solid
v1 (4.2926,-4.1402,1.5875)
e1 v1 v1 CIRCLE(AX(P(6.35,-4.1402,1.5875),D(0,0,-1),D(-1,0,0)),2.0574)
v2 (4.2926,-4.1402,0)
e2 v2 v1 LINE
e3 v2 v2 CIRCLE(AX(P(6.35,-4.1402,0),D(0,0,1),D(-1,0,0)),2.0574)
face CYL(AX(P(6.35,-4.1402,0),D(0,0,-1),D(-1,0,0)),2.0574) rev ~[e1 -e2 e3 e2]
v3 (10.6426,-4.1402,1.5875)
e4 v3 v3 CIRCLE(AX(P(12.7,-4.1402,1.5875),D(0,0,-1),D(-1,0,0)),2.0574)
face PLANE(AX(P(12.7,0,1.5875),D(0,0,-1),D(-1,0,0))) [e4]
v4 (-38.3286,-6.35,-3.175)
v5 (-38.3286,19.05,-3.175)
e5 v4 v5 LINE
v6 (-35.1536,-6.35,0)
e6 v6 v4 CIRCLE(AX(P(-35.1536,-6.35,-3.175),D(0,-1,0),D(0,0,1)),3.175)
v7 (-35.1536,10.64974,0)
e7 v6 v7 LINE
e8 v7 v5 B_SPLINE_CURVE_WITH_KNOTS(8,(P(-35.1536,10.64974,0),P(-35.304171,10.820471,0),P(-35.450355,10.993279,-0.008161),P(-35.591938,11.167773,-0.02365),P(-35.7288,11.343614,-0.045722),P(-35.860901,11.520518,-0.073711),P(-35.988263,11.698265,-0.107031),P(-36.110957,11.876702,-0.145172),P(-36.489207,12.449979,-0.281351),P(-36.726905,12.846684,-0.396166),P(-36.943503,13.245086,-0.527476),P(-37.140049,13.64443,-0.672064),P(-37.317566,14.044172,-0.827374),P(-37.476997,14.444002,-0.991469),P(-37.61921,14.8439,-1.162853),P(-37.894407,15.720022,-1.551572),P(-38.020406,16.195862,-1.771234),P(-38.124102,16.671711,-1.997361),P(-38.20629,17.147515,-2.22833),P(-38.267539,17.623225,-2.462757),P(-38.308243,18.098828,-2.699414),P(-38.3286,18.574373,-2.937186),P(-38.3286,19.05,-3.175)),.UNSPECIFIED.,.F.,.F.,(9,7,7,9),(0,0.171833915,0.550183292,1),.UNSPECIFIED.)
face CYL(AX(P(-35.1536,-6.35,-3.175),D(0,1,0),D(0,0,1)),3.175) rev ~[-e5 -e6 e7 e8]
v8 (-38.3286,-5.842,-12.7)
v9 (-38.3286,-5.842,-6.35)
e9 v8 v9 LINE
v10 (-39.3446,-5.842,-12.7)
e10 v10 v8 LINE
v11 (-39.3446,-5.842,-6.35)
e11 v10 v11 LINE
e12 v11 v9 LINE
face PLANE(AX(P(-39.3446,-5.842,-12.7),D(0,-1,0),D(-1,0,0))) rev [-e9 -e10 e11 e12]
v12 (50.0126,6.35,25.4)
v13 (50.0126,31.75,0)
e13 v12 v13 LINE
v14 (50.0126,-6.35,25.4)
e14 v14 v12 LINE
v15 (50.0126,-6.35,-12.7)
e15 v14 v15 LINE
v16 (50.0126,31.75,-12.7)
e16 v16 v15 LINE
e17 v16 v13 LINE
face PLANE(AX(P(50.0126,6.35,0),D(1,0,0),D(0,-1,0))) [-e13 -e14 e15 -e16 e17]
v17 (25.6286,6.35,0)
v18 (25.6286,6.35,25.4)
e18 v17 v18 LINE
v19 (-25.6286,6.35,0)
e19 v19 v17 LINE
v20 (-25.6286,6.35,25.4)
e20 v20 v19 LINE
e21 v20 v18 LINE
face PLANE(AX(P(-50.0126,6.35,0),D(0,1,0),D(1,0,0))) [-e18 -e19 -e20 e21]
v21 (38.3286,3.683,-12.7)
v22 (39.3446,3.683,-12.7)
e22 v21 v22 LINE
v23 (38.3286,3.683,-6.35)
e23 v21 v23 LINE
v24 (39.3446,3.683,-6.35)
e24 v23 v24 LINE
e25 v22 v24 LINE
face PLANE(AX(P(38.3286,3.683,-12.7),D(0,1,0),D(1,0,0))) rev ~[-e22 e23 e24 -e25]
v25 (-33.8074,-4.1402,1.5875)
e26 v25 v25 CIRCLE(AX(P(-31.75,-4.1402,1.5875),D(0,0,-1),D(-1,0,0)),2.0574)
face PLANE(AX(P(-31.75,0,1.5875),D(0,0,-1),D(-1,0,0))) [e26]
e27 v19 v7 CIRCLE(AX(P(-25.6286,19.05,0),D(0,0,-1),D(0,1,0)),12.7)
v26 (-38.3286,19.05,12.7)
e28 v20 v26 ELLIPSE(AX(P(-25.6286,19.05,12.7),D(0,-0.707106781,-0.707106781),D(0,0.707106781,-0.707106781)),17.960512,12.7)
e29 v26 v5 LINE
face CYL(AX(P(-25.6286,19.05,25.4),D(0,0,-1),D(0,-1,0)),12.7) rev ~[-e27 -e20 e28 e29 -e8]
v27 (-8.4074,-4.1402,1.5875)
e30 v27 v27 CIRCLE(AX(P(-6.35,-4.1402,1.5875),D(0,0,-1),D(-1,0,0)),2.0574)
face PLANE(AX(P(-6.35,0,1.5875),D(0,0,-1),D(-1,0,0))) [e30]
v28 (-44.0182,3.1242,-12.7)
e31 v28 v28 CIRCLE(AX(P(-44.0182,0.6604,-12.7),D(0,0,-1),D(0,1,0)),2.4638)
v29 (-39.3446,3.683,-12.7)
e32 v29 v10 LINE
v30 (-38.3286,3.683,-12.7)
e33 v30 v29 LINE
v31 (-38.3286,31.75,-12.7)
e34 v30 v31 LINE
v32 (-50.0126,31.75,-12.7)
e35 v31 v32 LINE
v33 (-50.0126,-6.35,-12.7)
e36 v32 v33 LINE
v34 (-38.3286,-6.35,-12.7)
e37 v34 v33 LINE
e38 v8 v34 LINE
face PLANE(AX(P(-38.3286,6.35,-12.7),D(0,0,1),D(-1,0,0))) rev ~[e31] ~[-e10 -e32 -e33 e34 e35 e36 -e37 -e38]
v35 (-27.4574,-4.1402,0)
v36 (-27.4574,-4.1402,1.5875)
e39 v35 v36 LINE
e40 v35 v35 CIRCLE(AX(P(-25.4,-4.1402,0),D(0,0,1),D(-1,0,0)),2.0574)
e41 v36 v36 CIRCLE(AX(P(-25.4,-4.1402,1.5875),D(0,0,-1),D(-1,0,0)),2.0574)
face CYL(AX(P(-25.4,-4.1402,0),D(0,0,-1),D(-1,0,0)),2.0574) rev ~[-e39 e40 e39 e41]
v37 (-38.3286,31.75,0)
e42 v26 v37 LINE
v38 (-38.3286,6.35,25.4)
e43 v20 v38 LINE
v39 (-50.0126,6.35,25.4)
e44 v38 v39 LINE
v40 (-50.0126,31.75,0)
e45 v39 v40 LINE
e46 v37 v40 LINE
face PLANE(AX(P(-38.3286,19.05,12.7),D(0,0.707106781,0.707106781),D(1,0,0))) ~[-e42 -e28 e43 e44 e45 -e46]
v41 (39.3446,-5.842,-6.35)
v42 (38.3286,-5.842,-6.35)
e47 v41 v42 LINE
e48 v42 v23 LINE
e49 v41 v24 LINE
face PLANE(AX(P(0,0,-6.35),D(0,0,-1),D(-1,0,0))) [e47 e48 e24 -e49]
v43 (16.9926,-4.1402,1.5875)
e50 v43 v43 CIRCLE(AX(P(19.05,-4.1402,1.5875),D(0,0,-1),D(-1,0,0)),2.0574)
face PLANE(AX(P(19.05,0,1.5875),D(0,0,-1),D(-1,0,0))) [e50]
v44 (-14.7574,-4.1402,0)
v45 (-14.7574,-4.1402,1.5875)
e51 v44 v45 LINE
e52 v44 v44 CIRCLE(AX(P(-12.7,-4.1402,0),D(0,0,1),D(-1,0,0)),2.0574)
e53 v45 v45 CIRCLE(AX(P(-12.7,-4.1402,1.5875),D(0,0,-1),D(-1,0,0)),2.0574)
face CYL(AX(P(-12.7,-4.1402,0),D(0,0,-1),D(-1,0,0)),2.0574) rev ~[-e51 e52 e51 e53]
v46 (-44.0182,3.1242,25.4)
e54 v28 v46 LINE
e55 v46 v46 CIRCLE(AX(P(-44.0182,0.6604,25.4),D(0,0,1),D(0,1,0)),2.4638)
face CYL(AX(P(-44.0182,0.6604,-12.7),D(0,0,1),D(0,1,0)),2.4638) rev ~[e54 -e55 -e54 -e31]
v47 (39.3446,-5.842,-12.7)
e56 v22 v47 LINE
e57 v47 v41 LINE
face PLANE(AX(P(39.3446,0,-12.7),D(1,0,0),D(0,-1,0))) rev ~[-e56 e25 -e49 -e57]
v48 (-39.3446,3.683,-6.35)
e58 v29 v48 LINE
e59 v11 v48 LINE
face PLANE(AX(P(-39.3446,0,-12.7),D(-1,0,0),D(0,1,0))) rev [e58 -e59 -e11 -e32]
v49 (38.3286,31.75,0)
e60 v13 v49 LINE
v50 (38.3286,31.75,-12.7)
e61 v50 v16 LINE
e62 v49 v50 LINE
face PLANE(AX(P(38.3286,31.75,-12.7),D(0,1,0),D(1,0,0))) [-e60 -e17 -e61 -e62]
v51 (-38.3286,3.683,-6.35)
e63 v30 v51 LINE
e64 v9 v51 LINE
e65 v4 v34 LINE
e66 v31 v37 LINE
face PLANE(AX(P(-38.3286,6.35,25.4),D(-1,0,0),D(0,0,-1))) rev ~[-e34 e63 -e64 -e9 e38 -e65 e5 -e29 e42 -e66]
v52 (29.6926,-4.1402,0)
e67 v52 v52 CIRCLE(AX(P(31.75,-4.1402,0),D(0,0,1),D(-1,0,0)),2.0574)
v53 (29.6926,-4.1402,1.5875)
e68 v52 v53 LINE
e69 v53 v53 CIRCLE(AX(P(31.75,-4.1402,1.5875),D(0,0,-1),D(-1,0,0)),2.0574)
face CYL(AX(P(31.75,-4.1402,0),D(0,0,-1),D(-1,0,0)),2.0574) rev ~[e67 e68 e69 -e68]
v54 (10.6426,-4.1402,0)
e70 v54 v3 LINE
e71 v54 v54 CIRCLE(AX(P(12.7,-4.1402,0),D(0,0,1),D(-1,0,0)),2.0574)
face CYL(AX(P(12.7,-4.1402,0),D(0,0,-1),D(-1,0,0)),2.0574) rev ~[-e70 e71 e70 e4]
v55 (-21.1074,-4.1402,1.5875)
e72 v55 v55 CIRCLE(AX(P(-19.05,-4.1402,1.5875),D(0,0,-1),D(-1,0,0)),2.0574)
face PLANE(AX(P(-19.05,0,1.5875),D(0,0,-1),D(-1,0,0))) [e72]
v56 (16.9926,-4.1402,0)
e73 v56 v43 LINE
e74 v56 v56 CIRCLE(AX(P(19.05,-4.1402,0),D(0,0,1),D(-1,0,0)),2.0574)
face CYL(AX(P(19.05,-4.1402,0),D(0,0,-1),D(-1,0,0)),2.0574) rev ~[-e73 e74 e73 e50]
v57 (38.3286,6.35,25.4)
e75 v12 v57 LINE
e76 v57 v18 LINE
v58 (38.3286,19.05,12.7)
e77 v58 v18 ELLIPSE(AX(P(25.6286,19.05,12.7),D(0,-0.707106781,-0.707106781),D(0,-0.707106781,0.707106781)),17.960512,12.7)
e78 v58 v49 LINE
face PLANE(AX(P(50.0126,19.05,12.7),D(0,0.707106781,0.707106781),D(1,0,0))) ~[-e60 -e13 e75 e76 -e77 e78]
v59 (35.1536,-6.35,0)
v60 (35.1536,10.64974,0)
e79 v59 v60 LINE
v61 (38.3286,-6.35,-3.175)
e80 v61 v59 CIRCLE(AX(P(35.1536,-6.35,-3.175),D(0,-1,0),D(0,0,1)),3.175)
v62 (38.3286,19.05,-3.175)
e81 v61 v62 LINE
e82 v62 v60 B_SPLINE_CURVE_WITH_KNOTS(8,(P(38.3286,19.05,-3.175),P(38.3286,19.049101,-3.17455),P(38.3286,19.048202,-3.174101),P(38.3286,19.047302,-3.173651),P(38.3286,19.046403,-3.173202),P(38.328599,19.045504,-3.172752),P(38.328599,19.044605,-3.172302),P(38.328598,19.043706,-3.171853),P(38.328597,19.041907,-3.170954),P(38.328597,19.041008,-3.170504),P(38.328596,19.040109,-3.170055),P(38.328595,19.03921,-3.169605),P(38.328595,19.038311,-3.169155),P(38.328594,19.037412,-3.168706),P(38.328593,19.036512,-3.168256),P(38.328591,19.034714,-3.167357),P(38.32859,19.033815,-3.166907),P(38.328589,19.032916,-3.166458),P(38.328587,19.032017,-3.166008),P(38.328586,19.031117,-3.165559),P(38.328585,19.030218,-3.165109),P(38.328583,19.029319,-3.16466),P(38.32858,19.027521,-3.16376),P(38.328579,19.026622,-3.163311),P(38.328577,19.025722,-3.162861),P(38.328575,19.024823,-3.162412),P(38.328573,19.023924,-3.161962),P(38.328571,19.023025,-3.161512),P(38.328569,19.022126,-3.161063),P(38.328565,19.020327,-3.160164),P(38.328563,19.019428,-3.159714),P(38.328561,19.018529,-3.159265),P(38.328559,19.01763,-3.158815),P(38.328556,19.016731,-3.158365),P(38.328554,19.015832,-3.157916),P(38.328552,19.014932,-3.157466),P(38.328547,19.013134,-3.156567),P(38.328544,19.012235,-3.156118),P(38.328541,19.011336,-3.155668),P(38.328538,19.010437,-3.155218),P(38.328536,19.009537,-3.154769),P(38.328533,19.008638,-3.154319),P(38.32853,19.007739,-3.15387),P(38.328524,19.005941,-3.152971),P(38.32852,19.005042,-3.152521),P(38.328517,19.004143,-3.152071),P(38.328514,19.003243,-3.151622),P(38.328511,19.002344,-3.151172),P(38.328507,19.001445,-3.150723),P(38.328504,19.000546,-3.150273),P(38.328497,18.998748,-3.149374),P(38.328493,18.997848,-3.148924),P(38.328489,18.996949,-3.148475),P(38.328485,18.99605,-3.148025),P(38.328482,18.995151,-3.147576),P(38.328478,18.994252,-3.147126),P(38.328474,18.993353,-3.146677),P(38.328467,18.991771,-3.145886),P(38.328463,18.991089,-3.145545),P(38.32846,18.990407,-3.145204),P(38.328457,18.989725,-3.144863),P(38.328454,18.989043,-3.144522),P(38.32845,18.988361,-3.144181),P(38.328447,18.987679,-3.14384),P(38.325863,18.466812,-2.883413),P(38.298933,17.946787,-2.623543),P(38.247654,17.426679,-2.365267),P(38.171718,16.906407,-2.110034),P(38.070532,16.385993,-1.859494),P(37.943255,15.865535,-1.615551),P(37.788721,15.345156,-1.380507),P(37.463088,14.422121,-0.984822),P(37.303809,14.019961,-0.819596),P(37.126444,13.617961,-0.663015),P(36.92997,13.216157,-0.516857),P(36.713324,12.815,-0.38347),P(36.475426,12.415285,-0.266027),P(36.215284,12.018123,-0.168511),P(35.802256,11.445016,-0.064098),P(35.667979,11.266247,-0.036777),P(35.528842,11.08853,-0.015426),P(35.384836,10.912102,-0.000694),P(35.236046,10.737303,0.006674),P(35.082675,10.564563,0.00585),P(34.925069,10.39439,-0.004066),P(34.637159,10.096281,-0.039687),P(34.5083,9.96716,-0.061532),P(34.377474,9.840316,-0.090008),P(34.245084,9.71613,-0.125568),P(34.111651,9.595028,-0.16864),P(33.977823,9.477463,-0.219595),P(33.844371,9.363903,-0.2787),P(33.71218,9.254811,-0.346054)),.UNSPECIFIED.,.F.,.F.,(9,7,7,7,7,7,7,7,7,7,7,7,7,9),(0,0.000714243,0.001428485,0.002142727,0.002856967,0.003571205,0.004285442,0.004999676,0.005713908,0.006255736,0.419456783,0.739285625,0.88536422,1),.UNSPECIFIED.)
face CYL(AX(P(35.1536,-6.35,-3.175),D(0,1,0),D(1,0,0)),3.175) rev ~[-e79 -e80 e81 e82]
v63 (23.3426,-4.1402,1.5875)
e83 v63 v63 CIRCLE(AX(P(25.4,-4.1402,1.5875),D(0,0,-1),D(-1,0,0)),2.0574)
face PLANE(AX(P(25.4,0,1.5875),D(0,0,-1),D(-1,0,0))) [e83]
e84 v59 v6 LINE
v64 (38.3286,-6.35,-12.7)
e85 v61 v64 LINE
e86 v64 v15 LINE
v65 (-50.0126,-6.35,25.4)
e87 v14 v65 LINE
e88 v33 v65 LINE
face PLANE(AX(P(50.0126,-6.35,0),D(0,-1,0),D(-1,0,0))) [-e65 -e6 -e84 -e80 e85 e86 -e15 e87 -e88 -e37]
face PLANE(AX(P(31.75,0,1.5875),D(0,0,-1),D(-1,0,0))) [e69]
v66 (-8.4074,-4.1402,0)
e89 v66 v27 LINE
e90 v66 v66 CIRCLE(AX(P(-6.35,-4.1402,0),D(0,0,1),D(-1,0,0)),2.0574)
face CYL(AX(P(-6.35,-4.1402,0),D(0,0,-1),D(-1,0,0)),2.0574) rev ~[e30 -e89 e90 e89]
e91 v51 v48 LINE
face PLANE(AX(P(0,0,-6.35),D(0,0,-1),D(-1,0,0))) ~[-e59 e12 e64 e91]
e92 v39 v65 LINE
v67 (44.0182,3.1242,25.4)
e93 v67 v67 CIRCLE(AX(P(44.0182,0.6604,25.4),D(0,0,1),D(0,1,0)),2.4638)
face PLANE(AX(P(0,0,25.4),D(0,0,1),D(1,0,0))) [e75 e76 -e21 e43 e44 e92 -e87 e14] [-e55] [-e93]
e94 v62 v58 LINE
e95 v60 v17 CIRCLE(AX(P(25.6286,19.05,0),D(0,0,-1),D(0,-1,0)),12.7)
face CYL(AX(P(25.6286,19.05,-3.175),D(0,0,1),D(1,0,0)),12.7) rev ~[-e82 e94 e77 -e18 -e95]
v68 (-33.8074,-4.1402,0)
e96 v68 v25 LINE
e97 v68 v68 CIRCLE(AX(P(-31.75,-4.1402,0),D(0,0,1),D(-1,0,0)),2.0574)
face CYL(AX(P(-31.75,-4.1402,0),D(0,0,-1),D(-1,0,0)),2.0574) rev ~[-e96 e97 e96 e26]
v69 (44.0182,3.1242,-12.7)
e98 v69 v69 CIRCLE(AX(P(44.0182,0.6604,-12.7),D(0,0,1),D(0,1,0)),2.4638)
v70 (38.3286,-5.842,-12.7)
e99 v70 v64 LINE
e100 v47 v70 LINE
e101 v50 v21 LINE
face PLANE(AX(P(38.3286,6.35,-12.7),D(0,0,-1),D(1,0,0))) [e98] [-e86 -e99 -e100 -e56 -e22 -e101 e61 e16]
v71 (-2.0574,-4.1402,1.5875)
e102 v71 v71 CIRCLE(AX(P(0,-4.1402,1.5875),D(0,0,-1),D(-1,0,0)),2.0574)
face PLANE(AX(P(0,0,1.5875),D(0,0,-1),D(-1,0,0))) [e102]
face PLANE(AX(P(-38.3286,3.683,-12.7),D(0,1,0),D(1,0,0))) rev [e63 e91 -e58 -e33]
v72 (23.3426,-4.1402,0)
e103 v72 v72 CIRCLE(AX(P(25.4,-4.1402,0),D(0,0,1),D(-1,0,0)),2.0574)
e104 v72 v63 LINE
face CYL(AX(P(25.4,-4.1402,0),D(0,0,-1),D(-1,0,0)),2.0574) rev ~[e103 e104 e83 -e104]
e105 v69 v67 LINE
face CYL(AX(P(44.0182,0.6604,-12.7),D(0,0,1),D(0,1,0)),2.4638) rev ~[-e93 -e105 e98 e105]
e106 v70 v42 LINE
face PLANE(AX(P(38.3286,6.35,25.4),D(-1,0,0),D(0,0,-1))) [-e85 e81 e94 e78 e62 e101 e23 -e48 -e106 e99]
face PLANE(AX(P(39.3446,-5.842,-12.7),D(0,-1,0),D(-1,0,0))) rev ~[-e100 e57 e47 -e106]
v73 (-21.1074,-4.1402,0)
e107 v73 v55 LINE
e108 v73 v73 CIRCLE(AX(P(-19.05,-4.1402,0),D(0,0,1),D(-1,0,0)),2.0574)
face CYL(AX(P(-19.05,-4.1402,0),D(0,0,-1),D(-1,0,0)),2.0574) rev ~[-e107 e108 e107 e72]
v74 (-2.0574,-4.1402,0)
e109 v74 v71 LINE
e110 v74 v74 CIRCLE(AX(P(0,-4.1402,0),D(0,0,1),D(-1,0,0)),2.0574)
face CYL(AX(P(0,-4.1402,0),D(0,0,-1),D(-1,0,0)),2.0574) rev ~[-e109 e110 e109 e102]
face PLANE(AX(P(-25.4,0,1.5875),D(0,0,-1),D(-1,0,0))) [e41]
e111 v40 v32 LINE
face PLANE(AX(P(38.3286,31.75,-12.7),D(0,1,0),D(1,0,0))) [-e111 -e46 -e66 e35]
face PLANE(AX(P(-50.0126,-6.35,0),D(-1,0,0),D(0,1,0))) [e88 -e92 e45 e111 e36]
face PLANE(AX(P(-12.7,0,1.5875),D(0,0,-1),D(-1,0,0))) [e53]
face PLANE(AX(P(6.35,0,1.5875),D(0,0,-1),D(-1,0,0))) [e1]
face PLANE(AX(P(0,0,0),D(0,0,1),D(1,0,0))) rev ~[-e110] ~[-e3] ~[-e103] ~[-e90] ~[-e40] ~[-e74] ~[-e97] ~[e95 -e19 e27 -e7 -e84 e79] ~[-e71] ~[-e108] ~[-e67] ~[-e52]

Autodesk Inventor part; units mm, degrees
ref_plane "YZ Plane" through (0, 0, 0) normal (1, 0, 0) x (0, 1, 0)
ref_plane "XZ Plane" through (0, 0, 0) normal (0, 1, 0) x (-1, 0, 0)
ref_plane "XY Plane" through (0, 0, 0) normal (0, 0, 1) x (1, 0, 0)
sketch "Sketch1" plane through (0, 0, 0) normal (0, 0, 1) x (1, 0, 0)
  line L0 (-50.0126, 6.35) -> (50.0126, 6.35)
  line L1 (50.0126, 6.35) -> (50.0126, -6.35)
  line L2 (50.0126, -6.35) -> (-50.0126, -6.35)
  line L3 (-50.0126, -6.35) -> (-50.0126, 6.35)
  line L4 (-50.0126, 6.35) -> (50.0126, -6.35) construction
  line L5 (50.0126, 6.35) -> (-50.0126, -6.35) construction
  point P0 (0, 0)
  dimension "d0" = 100.0252
  dimension "d1" = 12.7
extrude "Extrusion1" add sketch "Sketch1" along normal blind 25.4
sketch "Sketch2" plane through (0, 0, 0) normal (0, 0, 1) x (1, 0, 0)
  line L0 (-50.0126, -6.35) -> (50.0126, -6.35) projected
  line L1 (-50.0126, 6.35) -> (-50.0126, -6.35) projected
  line L2 (50.0126, 6.35) -> (-50.0126, 6.35) projected
  line L3 (50.0126, -6.35) -> (50.0126, 6.35) projected
  line L4 (-70.0176, 0) -> (70.0176, 0) projected
  line L5 (0, -8.89) -> (0, 8.89) projected
  line L6 (50.0126, -6.35) -> (50.0126, 6.35) projected
  line L7 (-50.0126, -6.35) -> (50.0126, -6.35) projected
  line L8 (50.0126, 6.35) -> (38.3286, 6.35)
  line L9 (38.3286, 6.35) -> (38.3286, -6.35)
  line L10 (38.3286, -6.35) -> (50.0126, -6.35)
  line L11 (50.0126, -6.35) -> (50.0126, 6.35)
  point P0 (0, 0)
  point P1 (38.3286, 6.35)
  point P2 (38.3286, -6.35)
  dimension "d4" = 11.684
extrude "Extrusion2" add sketch "Sketch2" against normal blind 12.7 contours L9 L4 L3 L0 | L9 L2 L3 L4
mirror "Mirror1" about plane through (0, 0, 0) normal (1, 0, 0) of "Extrusion2"
fillet "Fillet1" radius 3.175 2 edges at (38.3286, 0, 0) (-38.3286, 0, 0)
sketch "Sketch3" plane through (0, 0, 0) normal (0, 0, -1) x (-1, 0, 0)
  line L0 (70.0176, 0) -> (-70.0176, 0) projected
  line L1 (0, -8.89) -> (0, 8.89) projected
  line L2 (35.1536, 6.35) -> (35.1536, -6.35) projected
  line L3 (-35.1536, 6.35) -> (35.1536, 6.35) projected
  line L4 (-35.1536, -6.35) -> (-35.1536, 6.35) projected
  line L5 (35.1536, -6.35) -> (-35.1536, -6.35) projected
  circle A0 centre (0, -4.1402) radius 2.0574
  point P0 (0, 0)
  dimension "d9" = 4.1148
  dimension "d10" = 2.2098
extrude "Extrusion3" cut sketch "Sketch3" against normal blind 1.5875 contours A0 L1 | L1 A0
pattern_linear "Rectangular Pattern1" count 11 spacing 6.35 along (1, 0, 0) of "Extrusion3" first direction both ways yes
sketch "Sketch4" plane through (0, 0, -12.7) normal (0, 0, -1) x (-1, 0, 0)
  line L0 (70.0176, 0) -> (-70.0176, 0) projected
  line L1 (0, -8.89) -> (0, 8.89) projected
  line L2 (-50.0126, -6.35) -> (-38.3286, -6.35) projected
  line L3 (-38.3286, -6.35) -> (-38.3286, 6.35) projected
  line L4 (-38.3286, 6.35) -> (-50.0126, 6.35) projected
  line L5 (-50.0126, 6.35) -> (-50.0126, -6.35) projected
  line L6 (50.0126, -6.35) -> (38.3286, -6.35) projected
  line L7 (50.0126, 6.35) -> (50.0126, -6.35) projected
  line L8 (38.3286, 6.35) -> (50.0126, 6.35) projected
  line L9 (38.3286, -6.35) -> (38.3286, 6.35) projected
  line L10 (-38.3286, -6.35) -> (-38.3286, 6.35) projected
  line L11 (-38.3286, 3.683) -> (-39.3446, 3.683)
  line L12 (-39.3446, 3.683) -> (-39.3446, -5.842)
  line L13 (-39.3446, -5.842) -> (-38.3286, -5.842)
  line L14 (-38.3286, -5.842) -> (-38.3286, 3.683)
  point P0 (0, 0)
  point P1 (-38.3286, 3.683)
  dimension "d19" = 1.016
  dimension "d20" = 9.525
  dimension "d21" = 0.508
extrude "Extrusion4" cut sketch "Sketch4" against normal blind 6.35 contours L3 L13 L12 L0 | L0 L12 L11 L3
mirror "Mirror2" about plane through (0, 0, 0) normal (1, 0, 0) of "Extrusion4"
sketch "Sketch5" plane through (0, 0, -12.7) normal (0, 0, -1) x (-1, 0, 0)
  line L0 (-38.3286, -5.842) -> (-39.3446, -5.842) projected
  line L1 (-39.3446, -5.842) -> (-39.3446, 3.683) projected
  line L2 (-39.3446, 3.683) -> (-38.3286, 3.683) projected
  line L3 (-38.3286, 3.683) -> (-38.3286, 6.35) projected
  line L4 (-38.3286, 6.35) -> (-50.0126, 6.35) projected
  line L5 (-50.0126, 6.35) -> (-50.0126, -6.35) projected
  line L6 (-50.0126, -6.35) -> (-38.3286, -6.35) projected
  line L7 (-38.3286, -6.35) -> (-38.3286, -5.842) projected
  line L8 (47.9806, -6.35) -> (47.9806, 6.35) projected
  line L9 (50.0126, 6.35) -> (50.0126, -6.35) projected
  line L10 (38.3286, 3.683) -> (39.3446, 3.683) projected
  line L11 (39.3446, 3.683) -> (39.3446, -5.842) projected
  line L12 (39.3446, -5.842) -> (38.3286, -5.842) projected
  line L13 (38.3286, -6.35) -> (38.3286, -5.842) projected
  line L14 (50.0126, -6.35) -> (38.3286, -6.35) projected
  line L15 (50.0126, 6.35) -> (50.0126, -6.35) projected
  line L16 (38.3286, 6.35) -> (50.0126, 6.35) projected
  line L17 (38.3286, 3.683) -> (38.3286, 6.35) projected
  line L18 (70.0176, 0) -> (-70.0176, 0) projected
  line L19 (0, -8.89) -> (0, 8.89) projected
  circle A0 centre (-44.0182, 0.6604) radius 3.3782
  point P0 (0, 0)
  dimension "d24" = 6.7564
  dimension "d25" = 7.0104
  dimension "d26" = 5.9944
hole "Hole1" at (44.0182, 0.6604, -12.7) direction (0, 0, 1) diameter 4.9276 end through all clearance for "Socket Head Cap Screw" size "#8" standard "Ansi Unified Screw Threads"
mirror "Mirror3" about plane through (0, 0, 0) normal (1, 0, 0) of "Hole1"
sketch "Sketch6" plane through (38.3286, 6.35, -12.7) normal (0, 1, 0) x (1, 0, 0)
  line L0 (11.684, -38.1) -> (-88.3412, -38.1) projected
  line L1 (11.684, 0) -> (11.684, -38.1) projected
  line L2 (0, 0) -> (11.684, 0) projected
  line L3 (0, -9.525) -> (0, 0) projected
  arc A0 (-3.175, -12.7) -> (0, -9.525) centre (-3.175, -9.525) ccw projected
  line L4 (-3.175, -12.7) -> (-73.4822, -12.7) projected
  arc A1 (-76.6572, -9.525) -> (-73.4822, -12.7) centre (-73.4822, -9.525) ccw projected
  line L5 (-76.6572, -9.525) -> (-76.6572, 0) projected
  line L6 (-76.6572, 0) -> (-88.3412, 0) projected
  line L7 (-88.3412, 0) -> (-88.3412, -38.1) projected
  line L8 (-108.397, -12.7) -> (31.9938, -12.7) projected
  line L9 (-38.3286, 7.62) -> (-38.3286, -45.72) projected
  line L10 (0, -9.525) -> (0, 0) projected
  line L11 (0, 0) -> (11.684, 0)
  line L12 (11.684, 0) -> (11.684, -38.1)
  line L13 (11.684, -38.1) -> (0, -38.1)
  line L14 (0, -38.1) -> (0, 0)
  line L15 (-88.3412, 0) -> (-88.3412, -38.1)
  line L16 (-76.6572, 0) -> (-88.3412, 0)
  line L17 (-76.6572, -9.525) -> (-76.6572, 0)
  arc A2 (-76.6572, -9.525) -> (-73.4822, -12.7) centre (-73.4822, -9.525) ccw
  line L18 (-76.6572, -9.525) -> (-76.6572, 0)
  line L19 (-76.6572, 0) -> (-88.3412, 0)
  line L20 (-88.3412, 0) -> (-88.3412, -38.1)
  line L21 (-88.3412, -38.1) -> (-76.6572, -38.1)
  line L22 (-76.6572, -38.1) -> (-76.6572, 0)
  point P0 (-38.3286, -12.7)
extrude "Extrusion5" add sketch "Sketch6" along normal blind 25.4 contours L0 L14 L8 L1 | L8 L14 L3 L2 L1 | L0 L7 L8 L22 | L8 L7 L6 L5 L22
chamfer "Chamfer2" distance 25.4 angle 45 2 edges at (44.1706, 31.75, 25.4) (-44.1706, 31.75, 25.4)
fillet "Fillet3" radius 12.7 2 edges at (38.3286, 6.35, 11.1125) (-38.3286, 6.35, 11.1125)
equation "\"d32\" = Thickness"
equation "\"BendRadius\" = Thickness"
equation "\"BendReliefWidth\" = Thickness"
equation "\"BendReliefDepth\" = 0.5 * Thickness"
equation "\"CornerReliefSize\" = 4 * Thickness"
equation "\"MinimumRemnant\" = 2 * Thickness"
equation "\"TransitionRadius\" = BendRadius"
equation "\"JacobiRadiusSize\" = BendRadius"
equation "\"GapSize\" = Thickness"
equation "\"Thickness\" = 3.048"
properties part number "_3DPrint"
